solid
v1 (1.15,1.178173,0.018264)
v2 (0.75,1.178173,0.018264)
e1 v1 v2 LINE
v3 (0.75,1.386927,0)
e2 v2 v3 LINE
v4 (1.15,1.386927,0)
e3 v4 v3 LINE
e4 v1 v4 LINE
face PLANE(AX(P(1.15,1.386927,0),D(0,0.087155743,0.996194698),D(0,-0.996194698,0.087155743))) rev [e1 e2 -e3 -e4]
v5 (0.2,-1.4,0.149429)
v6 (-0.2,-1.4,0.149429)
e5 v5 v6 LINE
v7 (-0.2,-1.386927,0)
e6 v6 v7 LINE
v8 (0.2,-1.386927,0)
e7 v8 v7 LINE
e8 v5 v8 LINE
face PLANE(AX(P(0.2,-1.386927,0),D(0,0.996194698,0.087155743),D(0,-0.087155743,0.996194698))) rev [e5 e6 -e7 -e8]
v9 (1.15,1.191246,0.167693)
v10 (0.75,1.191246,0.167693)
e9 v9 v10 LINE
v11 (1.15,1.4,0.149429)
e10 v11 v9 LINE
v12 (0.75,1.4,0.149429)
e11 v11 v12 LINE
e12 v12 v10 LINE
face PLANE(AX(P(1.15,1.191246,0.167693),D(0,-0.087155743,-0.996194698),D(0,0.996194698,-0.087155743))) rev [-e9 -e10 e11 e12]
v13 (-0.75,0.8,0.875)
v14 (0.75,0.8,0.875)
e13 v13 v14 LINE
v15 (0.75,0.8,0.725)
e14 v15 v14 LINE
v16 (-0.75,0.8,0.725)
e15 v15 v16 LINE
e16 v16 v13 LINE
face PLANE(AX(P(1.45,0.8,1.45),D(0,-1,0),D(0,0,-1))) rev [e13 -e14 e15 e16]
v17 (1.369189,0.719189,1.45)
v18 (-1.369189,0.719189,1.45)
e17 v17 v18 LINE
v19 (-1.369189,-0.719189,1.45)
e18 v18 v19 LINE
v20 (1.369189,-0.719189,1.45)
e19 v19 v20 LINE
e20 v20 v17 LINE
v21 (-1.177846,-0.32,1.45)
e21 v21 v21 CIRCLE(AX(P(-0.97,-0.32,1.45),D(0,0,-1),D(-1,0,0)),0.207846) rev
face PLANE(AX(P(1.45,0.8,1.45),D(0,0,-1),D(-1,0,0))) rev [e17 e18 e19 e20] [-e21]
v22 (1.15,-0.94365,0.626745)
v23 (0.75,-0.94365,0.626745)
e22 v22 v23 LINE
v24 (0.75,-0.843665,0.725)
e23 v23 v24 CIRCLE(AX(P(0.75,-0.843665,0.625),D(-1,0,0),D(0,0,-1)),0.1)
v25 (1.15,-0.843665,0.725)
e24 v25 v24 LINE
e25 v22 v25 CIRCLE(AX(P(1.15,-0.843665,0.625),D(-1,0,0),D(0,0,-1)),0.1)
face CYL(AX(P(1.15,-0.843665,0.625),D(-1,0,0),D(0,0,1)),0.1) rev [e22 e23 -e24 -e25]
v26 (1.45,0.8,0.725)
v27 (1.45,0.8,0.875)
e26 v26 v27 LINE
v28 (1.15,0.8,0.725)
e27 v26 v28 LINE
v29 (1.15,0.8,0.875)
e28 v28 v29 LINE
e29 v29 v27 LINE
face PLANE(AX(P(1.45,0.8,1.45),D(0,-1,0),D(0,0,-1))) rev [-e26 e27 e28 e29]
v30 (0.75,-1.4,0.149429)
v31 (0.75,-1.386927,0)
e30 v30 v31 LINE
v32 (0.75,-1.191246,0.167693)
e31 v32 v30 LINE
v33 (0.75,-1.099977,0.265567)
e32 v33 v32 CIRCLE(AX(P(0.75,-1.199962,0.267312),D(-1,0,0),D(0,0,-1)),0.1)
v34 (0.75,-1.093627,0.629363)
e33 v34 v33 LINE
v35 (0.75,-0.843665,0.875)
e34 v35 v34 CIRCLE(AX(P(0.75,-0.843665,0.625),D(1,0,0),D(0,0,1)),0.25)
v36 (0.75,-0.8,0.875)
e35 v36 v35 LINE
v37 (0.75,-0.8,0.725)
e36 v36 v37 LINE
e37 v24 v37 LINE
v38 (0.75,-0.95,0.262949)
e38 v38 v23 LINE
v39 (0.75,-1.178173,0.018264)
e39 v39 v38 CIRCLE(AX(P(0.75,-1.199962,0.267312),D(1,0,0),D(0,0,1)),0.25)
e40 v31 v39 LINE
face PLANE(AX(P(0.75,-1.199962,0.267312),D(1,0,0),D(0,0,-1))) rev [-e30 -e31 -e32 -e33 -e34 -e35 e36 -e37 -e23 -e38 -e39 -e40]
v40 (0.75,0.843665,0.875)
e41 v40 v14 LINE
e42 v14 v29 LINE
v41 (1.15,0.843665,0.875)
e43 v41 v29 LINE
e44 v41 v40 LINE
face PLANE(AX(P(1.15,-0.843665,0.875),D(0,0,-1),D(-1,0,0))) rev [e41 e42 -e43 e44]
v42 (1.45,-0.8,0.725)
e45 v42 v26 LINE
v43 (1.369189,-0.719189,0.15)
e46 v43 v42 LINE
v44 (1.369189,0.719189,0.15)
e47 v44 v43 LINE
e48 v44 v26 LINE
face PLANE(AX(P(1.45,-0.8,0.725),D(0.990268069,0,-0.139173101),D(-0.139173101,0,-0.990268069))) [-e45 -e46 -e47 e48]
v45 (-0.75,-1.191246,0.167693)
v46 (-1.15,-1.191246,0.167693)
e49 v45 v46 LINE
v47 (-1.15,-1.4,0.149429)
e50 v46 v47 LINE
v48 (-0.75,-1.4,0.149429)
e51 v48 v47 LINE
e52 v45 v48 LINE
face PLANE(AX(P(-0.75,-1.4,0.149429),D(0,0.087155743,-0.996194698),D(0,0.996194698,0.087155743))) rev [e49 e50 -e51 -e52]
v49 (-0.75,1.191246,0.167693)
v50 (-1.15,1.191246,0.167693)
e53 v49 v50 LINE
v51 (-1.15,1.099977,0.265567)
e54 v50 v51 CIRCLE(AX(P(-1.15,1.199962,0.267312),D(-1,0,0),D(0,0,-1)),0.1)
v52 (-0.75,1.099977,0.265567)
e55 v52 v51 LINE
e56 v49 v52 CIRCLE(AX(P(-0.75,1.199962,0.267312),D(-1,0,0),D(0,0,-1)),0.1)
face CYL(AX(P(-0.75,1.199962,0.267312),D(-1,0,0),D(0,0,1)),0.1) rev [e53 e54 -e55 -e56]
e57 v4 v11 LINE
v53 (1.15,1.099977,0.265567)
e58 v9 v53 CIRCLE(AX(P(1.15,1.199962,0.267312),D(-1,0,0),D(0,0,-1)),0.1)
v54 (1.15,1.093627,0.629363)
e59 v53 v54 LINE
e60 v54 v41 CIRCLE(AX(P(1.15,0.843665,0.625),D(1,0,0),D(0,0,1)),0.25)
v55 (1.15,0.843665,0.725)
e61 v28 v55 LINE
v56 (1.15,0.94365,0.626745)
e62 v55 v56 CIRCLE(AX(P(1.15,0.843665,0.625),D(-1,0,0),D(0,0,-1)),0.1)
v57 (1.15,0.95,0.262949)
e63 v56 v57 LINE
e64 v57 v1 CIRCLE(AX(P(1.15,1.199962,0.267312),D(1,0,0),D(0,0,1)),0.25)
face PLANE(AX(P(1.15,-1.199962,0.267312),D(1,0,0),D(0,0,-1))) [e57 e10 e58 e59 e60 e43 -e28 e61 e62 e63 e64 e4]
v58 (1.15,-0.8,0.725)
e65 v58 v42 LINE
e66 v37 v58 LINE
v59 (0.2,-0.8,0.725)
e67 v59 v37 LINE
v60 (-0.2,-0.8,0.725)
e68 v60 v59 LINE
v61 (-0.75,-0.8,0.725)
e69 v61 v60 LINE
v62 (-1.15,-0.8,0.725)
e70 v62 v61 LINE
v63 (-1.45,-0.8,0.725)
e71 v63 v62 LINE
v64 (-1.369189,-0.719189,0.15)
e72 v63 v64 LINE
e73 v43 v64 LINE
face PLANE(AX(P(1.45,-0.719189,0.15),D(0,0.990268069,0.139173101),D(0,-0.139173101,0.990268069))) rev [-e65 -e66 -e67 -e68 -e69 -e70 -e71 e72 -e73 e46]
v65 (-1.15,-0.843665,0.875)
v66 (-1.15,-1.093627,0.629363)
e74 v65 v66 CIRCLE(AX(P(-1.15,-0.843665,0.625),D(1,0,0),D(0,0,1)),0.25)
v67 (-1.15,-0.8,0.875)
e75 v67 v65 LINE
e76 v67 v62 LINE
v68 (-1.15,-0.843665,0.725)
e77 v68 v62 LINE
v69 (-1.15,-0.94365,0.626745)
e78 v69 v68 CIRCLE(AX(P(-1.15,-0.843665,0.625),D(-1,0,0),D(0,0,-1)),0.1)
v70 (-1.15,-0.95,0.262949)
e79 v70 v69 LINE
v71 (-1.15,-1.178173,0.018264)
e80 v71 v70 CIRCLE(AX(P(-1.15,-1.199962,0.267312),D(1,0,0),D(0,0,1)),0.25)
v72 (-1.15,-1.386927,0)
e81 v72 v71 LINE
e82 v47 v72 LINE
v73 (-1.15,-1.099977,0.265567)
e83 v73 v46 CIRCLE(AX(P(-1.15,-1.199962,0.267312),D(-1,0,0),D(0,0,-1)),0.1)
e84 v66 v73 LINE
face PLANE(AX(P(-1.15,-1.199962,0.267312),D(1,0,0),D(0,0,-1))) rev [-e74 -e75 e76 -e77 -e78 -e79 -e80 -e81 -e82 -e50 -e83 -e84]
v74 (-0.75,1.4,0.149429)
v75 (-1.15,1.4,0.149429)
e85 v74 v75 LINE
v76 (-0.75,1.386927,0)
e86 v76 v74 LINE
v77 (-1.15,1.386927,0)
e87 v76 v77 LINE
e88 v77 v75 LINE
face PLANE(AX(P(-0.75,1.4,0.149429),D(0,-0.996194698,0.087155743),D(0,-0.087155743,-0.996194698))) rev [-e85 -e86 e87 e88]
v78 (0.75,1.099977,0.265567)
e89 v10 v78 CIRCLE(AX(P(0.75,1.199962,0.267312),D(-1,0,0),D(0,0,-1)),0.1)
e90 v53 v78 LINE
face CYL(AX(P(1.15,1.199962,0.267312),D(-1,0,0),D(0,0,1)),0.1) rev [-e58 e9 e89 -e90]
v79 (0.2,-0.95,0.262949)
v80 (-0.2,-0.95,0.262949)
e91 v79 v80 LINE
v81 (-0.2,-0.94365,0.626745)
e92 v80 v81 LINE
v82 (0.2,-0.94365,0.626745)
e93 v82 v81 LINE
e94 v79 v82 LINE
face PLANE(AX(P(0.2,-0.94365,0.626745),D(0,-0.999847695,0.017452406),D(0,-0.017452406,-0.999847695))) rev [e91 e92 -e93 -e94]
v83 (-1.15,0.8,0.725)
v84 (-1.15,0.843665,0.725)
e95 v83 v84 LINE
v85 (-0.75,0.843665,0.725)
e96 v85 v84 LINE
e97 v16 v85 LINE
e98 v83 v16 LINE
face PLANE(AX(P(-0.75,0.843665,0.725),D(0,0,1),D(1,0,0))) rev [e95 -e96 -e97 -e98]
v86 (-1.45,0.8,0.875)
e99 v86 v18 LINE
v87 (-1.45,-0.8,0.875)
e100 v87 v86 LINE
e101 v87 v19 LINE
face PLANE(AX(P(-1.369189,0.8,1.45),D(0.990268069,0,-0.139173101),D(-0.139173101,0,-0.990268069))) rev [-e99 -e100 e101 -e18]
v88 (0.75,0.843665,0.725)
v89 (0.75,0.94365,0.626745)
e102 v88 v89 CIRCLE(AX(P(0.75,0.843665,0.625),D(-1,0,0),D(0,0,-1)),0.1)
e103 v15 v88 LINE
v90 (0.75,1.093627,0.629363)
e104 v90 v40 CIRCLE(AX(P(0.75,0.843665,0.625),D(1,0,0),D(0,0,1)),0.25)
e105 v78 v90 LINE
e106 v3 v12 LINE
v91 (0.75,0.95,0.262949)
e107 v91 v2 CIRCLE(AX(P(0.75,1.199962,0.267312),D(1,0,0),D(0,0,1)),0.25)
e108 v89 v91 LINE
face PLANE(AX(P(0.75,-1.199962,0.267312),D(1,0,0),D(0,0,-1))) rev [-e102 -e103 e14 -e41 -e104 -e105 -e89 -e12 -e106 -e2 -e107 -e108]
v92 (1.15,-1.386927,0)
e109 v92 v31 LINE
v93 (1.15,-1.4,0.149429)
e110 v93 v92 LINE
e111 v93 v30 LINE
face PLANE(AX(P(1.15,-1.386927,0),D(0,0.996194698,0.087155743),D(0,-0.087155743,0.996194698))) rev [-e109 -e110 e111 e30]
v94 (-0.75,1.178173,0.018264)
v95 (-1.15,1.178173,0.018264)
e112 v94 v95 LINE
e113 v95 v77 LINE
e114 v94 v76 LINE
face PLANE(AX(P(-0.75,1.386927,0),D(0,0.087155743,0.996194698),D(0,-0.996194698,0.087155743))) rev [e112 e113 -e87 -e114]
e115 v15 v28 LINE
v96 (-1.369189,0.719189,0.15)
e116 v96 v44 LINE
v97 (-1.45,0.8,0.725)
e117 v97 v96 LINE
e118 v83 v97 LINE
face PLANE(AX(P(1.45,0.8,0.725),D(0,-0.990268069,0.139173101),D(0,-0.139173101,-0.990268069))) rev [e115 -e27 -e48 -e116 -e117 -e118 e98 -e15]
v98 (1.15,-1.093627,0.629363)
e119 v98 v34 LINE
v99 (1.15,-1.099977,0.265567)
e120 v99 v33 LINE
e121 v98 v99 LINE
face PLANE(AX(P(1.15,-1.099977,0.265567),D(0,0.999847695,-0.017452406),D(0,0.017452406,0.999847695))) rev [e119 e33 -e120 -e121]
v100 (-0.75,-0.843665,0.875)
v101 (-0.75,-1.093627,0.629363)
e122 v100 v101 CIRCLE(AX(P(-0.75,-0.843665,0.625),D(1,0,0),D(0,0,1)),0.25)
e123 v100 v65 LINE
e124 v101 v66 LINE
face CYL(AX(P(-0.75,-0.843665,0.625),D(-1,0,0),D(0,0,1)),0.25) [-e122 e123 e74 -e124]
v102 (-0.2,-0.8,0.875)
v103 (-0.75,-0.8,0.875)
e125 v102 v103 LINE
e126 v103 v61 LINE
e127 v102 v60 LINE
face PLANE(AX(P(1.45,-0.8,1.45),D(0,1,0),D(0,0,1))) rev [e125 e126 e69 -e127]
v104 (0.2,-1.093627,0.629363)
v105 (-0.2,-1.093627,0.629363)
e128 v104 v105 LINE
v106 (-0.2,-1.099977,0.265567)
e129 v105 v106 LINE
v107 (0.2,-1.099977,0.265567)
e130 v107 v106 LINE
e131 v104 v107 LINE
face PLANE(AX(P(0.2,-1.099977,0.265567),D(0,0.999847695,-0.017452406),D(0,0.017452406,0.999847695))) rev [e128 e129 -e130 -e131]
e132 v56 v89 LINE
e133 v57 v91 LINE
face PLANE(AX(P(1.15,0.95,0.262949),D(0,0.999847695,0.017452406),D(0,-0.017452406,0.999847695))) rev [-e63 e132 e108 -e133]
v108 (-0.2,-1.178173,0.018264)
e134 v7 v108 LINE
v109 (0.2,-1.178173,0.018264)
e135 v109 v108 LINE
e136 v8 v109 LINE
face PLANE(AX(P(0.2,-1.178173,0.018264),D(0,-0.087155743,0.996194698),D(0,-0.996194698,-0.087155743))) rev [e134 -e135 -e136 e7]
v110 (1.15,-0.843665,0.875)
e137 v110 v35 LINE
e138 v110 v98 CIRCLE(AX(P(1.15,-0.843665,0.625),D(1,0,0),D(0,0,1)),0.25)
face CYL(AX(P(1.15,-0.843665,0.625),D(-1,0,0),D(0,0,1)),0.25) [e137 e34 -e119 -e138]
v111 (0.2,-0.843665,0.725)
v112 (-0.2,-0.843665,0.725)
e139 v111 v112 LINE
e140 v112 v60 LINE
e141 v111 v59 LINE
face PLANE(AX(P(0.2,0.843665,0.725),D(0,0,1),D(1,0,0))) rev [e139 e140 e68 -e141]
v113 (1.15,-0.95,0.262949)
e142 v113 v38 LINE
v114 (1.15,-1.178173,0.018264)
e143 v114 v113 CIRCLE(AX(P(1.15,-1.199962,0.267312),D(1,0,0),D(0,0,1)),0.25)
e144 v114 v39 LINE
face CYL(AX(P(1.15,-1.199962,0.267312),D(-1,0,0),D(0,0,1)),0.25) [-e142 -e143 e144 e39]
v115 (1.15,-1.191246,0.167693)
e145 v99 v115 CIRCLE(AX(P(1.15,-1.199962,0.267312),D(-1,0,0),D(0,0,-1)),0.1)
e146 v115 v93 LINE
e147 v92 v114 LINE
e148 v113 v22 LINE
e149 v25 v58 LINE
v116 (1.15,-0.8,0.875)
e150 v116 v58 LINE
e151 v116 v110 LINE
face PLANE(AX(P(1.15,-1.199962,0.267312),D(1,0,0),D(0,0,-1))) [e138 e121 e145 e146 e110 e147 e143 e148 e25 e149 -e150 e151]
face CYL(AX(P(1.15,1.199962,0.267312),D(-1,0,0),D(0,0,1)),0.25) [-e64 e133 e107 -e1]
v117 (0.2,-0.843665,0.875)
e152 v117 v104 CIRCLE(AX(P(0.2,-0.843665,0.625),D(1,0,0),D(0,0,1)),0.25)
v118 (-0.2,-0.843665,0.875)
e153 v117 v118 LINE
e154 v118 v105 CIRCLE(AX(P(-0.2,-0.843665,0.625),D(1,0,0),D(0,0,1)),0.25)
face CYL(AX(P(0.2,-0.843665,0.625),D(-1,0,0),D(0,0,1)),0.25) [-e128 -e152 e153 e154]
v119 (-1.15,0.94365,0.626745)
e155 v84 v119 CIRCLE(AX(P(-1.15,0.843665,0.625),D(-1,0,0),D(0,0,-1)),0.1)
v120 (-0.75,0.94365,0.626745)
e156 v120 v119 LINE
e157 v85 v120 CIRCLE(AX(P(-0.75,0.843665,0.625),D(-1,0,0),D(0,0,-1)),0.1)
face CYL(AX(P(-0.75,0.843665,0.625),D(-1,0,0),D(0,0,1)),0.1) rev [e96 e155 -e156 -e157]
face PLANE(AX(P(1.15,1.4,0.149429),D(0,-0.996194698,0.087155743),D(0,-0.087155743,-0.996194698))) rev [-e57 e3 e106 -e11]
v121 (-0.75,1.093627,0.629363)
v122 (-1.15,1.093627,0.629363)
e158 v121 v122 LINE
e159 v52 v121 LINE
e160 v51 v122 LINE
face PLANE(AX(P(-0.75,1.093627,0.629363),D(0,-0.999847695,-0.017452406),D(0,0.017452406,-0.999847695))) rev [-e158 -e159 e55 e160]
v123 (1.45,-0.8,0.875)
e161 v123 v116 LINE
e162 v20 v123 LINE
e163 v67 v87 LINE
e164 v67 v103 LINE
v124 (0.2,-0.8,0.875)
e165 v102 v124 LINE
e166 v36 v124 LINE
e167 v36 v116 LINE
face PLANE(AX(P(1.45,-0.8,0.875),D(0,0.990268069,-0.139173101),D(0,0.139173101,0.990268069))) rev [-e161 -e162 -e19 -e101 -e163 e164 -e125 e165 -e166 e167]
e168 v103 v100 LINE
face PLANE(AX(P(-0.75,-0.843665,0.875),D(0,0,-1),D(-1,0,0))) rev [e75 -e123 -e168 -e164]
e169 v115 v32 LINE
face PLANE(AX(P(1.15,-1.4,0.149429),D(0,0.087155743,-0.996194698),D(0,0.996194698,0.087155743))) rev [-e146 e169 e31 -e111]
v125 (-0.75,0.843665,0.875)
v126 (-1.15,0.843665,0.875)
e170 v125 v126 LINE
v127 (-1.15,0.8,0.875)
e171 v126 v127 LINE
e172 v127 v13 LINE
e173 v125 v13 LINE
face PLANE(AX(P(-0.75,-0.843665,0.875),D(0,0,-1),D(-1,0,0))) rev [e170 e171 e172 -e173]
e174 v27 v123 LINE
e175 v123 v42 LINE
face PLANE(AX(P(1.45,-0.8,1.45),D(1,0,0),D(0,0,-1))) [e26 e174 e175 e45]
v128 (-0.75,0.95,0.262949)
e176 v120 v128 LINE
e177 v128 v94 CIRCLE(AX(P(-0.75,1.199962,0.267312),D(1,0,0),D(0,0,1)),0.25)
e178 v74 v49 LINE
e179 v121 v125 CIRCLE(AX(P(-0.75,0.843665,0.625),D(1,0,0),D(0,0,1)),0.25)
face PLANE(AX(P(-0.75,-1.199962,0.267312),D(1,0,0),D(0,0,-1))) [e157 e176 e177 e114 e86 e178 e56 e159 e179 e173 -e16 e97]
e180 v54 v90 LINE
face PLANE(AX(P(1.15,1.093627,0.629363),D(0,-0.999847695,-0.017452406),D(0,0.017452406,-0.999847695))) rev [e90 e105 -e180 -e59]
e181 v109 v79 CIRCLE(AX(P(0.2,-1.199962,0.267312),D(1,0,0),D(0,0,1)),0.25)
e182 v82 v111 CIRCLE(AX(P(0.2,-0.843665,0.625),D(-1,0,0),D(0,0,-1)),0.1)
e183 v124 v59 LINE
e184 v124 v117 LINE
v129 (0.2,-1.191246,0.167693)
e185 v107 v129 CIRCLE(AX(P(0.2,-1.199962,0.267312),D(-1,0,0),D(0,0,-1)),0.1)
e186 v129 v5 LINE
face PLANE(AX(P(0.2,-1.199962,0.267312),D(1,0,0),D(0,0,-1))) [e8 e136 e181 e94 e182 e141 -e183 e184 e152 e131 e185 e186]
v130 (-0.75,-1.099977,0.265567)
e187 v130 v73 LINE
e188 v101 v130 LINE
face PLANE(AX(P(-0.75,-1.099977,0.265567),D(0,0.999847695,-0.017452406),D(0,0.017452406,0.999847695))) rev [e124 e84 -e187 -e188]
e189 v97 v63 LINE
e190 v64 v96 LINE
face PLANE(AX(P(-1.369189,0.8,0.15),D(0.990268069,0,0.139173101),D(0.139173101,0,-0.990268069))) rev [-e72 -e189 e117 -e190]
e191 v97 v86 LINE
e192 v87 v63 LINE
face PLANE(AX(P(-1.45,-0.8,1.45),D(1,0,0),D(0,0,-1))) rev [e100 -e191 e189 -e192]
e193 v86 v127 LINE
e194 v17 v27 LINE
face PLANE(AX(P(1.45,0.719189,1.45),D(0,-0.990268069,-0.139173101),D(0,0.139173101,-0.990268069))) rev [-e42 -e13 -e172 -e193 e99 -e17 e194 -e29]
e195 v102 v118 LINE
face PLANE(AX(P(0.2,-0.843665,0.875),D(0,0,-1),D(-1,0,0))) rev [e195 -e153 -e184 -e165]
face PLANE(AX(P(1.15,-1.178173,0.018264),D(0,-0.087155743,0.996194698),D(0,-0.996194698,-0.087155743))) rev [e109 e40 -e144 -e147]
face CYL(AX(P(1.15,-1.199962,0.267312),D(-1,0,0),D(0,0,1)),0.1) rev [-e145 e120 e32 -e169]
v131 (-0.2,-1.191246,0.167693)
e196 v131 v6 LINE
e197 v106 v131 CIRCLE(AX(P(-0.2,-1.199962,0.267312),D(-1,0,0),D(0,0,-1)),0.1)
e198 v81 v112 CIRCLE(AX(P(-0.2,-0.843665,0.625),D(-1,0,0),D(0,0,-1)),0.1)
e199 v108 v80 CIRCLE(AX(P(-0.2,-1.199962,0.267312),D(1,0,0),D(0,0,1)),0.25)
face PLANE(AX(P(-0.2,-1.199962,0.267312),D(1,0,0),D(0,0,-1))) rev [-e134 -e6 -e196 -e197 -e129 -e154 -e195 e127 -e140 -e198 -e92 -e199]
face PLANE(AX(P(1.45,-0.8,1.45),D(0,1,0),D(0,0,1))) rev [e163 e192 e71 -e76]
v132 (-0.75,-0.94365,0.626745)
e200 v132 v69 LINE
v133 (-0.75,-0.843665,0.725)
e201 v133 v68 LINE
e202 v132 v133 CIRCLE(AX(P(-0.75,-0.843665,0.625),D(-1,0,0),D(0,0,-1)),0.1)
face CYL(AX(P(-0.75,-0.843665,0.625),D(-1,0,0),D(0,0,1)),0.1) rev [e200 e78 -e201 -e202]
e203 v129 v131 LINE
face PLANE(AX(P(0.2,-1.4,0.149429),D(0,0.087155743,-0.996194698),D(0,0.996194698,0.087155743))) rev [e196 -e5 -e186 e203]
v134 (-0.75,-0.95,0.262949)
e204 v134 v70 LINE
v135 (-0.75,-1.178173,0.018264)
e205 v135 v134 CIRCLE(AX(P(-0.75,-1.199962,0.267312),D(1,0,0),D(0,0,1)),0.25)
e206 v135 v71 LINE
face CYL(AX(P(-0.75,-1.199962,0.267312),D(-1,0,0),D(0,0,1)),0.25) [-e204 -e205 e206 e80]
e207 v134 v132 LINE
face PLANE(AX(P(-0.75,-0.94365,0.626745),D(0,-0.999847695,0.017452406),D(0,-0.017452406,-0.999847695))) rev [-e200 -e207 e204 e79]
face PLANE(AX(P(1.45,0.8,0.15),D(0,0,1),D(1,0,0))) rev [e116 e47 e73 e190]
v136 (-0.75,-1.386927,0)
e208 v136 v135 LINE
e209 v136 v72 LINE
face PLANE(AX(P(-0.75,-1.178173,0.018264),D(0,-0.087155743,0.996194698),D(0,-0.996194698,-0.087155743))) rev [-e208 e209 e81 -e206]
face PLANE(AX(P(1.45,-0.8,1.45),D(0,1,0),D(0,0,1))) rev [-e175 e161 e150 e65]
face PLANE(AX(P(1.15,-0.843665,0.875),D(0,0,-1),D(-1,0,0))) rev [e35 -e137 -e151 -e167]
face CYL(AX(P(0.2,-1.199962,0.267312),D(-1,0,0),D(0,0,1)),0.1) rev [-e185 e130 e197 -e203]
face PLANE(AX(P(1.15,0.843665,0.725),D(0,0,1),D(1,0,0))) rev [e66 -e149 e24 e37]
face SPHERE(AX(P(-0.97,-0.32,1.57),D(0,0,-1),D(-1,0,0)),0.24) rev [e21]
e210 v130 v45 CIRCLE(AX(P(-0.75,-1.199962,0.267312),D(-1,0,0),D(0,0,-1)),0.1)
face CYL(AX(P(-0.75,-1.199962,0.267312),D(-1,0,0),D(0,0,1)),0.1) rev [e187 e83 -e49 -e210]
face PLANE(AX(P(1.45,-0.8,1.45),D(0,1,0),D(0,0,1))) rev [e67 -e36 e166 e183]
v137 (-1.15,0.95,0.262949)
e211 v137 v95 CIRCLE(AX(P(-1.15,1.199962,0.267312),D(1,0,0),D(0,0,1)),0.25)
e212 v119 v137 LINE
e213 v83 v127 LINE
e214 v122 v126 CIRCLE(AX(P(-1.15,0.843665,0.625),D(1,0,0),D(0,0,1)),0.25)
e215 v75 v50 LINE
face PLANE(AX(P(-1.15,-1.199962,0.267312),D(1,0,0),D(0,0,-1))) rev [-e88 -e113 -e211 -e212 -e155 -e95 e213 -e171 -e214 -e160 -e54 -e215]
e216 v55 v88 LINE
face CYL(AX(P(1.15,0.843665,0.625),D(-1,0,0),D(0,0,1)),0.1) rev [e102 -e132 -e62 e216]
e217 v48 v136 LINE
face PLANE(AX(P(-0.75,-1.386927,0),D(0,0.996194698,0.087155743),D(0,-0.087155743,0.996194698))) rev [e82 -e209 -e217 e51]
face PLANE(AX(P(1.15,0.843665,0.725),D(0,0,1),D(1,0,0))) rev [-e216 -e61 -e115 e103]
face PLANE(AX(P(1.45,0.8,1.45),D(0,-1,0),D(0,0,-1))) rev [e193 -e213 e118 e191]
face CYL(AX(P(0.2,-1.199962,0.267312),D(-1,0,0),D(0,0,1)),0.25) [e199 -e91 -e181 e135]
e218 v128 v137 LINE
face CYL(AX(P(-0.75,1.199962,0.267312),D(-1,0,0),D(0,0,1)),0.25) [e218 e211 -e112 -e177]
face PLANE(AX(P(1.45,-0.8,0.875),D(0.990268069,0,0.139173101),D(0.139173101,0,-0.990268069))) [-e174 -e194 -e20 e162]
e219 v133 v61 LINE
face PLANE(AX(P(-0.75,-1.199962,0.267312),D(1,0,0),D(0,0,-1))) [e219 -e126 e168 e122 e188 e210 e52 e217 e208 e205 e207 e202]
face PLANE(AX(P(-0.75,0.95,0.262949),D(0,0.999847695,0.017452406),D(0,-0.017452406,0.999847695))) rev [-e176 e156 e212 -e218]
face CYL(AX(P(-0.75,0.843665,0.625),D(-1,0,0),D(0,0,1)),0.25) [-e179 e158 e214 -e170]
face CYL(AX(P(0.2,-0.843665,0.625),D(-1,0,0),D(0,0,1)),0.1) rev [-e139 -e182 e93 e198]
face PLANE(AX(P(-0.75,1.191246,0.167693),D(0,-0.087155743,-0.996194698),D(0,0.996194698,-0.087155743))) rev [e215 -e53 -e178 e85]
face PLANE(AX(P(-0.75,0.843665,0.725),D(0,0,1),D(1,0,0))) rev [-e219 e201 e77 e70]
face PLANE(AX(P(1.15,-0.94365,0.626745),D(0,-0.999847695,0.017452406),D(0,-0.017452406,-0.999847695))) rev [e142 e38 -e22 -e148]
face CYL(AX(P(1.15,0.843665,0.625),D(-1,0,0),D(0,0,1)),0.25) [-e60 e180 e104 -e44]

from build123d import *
from OCP.BRepFilletAPI import BRepFilletAPI_MakeChamfer
from build123d.topology import SkipClean

# Parameters (mm, degrees)
BODYWXH_W             = 1.3
BODYWXH_H             = 1.6
BOSS_BODY_DEPTH       = 1.45
CHAMFER1_SIZE         = 0.575
CHAMFER1_SIZE2        = 0.08081098
PINS_DEPTH            = 0.4
PATTERNLEADS_COUNT    = 3
PATTERNLEADS_PITCH    = 0.95
DELETEFACE1_START     = 0.8
DELETEFACE1_OUTLINE_W = 0.4
DELETEFACE1_OUTLINE_H = 1.875
DELETEFACE1_DEPTH     = 0.6


# Read off the part's stored shape, not the designer's step: DeleteFace1
with BuildPart() as part:
    # BodyWxH → Boss-Body (new, symmetric)
    with BuildSketch(Plane(origin=(0, 0, 0), x_dir=(0, 0, -1), z_dir=(1, 0, 0))):
        with Locations((-0.8, 0)):
            Rectangle(BODYWXH_W, BODYWXH_H)
    extrude(amount=BOSS_BODY_DEPTH, both=True)

    # Chamfer1: one chamfer whose edges measure the first distance from different faces: ONE call of the kernel's chamfer builder (chamfer() names one face for all edges)
    chamfer1_edges_1 = [part.edges().sort_by_distance(p)[0] for p in [
        (1.45, 0, 0.15),
        (1.45, 0, 1.45),
    ]]
    chamfer1_side_1 = [part.faces().sort_by_distance(p)[0] for p in [
        (1.45, 0, 0.8),
    ]]
    chamfer1_edges_2 = [part.edges().sort_by_distance(p)[0] for p in [
        (-1.45, 0, 0.15),
        (-1.45, 0, 1.45),
    ]]
    chamfer1_side_2 = [part.faces().sort_by_distance(p)[0] for p in [
        (-1.45, 0, 0.8),
    ]]
    chamfer1_edges_3 = [part.edges().sort_by_distance(p)[0] for p in [
        (0, 0.8, 1.45),
        (0, 0.8, 0.15),
    ]]
    chamfer1_side_3 = [part.faces().sort_by_distance(p)[0] for p in [
        (0, 0.8, 0.8),
    ]]
    chamfer1_edges_4 = [part.edges().sort_by_distance(p)[0] for p in [
        (0, -0.8, 0.15),
        (0, -0.8, 1.45),
    ]]
    chamfer1_side_4 = [part.faces().sort_by_distance(p)[0] for p in [
        (0, -0.8, 0.8),
    ]]
    chamfer1 = BRepFilletAPI_MakeChamfer(part.part.solid().wrapped)
    for e in chamfer1_edges_1:
        chamfer1.Add(CHAMFER1_SIZE, CHAMFER1_SIZE2, e.wrapped, chamfer1_side_1[0].wrapped)  # the first distance lies on this face
    for e in chamfer1_edges_2:
        chamfer1.Add(CHAMFER1_SIZE, CHAMFER1_SIZE2, e.wrapped, chamfer1_side_2[0].wrapped)  # the first distance lies on this face
    for e in chamfer1_edges_3:
        chamfer1.Add(CHAMFER1_SIZE, CHAMFER1_SIZE2, e.wrapped, chamfer1_side_3[0].wrapped)  # the first distance lies on this face
    for e in chamfer1_edges_4:
        chamfer1.Add(CHAMFER1_SIZE, CHAMFER1_SIZE2, e.wrapped, chamfer1_side_4[0].wrapped)  # the first distance lies on this face
    add(Compound.cast(chamfer1.Shape()), mode=Mode.REPLACE)

    # LeadCross → Pins (add)
    with BuildSketch(Plane(origin=(-1.15, 0, 0), x_dir=(0, 0, -1), z_dir=(1, 0, 0))):
        with BuildLine():
            Line((0, -1.386926639), (-0.149429205, -1.4))
            Line((-0.149429205, -1.4), (-0.167692783, -1.19124635))
            ThreePointArc((-0.167692783, -1.19124635), (-0.199112416, -1.126826554), (-0.265567012, -1.099977154))
            Line((-0.265567012, -1.099977154), (-0.629363102, -1.09362707))
            ThreePointArc((-0.629363102, -1.09362707), (-0.803312612, -1.018892462), (-0.875, -0.843665146))
            Line((-0.875, -0.843665146), (-0.875, 0.843665146))
            ThreePointArc((-0.875, 0.843665146), (-0.803312612, 1.018892462), (-0.629363102, 1.09362707))
            Line((-0.629363102, 1.09362707), (-0.265567012, 1.099977154))
            ThreePointArc((-0.265567012, 1.099977154), (-0.199112416, 1.126826554), (-0.167692783, 1.19124635))
            Line((-0.167692783, 1.19124635), (-0.149429205, 1.4))
            Line((-0.149429205, 1.4), (0, 1.386926639))
            Line((0, 1.386926639), (-0.018263578, 1.178172988))
            ThreePointArc((-0.018263578, 1.178172988), (-0.096812662, 1.017123498), (-0.262949151, 0.95))
            Line((-0.262949151, 0.95), (-0.626745241, 0.943649916))
            ThreePointArc((-0.626745241, 0.943649916), (-0.696325045, 0.913756073), (-0.725, 0.843665146))
            Line((-0.725, 0.843665146), (-0.725, -0.843665146))
            ThreePointArc((-0.725, -0.843665146), (-0.696325045, -0.913756073), (-0.626745241, -0.943649916))
            Line((-0.626745241, -0.943649916), (-0.262949151, -0.95))
            ThreePointArc((-0.262949151, -0.95), (-0.096812662, -1.017123498), (-0.018263578, -1.178172988))
            Line((-0.018263578, -1.178172988), (0, -1.386926639))
        make_face()
    pins = extrude(amount=PINS_DEPTH)

    # PatternLeads: Pins ×3
    with Locations(*[(i * PATTERNLEADS_PITCH, 0, 0) for i in range(1, PATTERNLEADS_COUNT)]):
        add(pins)

    # Pin1Indent → Cut-Pin1Indent (revolve, cut)
    with SkipClean():  # the faces are left unmerged after this step: merging them gives an invalid solid
        with BuildSketch(Plane(origin=(-0.97, 0, 0), x_dir=(0, 0, -1), z_dir=(1, 0, 0))):
            with BuildLine():
                Line((-1.57, -0.08), (-1.57, -0.56))
                ThreePointArc((-1.57, -0.56), (-1.33, -0.32), (-1.57, -0.08))
            make_face()
        revolve(axis=Axis((-0.97, -0.08, 1.57), (0, -1, 0)), mode=Mode.SUBTRACT)

    # DeleteFace1 outline → DeleteFace1 (cut)
    with SkipClean():  # the faces are left unmerged after this step: merging them gives an invalid solid
        with BuildSketch(Plane(origin=(0, 0, 0), x_dir=(1, 0, 0), z_dir=(0, 1, 0)).offset(DELETEFACE1_START)):
            with Locations((0, 0.0625)):
                Rectangle(DELETEFACE1_OUTLINE_W, DELETEFACE1_OUTLINE_H)
        extrude(amount=DELETEFACE1_DEPTH, mode=Mode.SUBTRACT)


solid = part.part
